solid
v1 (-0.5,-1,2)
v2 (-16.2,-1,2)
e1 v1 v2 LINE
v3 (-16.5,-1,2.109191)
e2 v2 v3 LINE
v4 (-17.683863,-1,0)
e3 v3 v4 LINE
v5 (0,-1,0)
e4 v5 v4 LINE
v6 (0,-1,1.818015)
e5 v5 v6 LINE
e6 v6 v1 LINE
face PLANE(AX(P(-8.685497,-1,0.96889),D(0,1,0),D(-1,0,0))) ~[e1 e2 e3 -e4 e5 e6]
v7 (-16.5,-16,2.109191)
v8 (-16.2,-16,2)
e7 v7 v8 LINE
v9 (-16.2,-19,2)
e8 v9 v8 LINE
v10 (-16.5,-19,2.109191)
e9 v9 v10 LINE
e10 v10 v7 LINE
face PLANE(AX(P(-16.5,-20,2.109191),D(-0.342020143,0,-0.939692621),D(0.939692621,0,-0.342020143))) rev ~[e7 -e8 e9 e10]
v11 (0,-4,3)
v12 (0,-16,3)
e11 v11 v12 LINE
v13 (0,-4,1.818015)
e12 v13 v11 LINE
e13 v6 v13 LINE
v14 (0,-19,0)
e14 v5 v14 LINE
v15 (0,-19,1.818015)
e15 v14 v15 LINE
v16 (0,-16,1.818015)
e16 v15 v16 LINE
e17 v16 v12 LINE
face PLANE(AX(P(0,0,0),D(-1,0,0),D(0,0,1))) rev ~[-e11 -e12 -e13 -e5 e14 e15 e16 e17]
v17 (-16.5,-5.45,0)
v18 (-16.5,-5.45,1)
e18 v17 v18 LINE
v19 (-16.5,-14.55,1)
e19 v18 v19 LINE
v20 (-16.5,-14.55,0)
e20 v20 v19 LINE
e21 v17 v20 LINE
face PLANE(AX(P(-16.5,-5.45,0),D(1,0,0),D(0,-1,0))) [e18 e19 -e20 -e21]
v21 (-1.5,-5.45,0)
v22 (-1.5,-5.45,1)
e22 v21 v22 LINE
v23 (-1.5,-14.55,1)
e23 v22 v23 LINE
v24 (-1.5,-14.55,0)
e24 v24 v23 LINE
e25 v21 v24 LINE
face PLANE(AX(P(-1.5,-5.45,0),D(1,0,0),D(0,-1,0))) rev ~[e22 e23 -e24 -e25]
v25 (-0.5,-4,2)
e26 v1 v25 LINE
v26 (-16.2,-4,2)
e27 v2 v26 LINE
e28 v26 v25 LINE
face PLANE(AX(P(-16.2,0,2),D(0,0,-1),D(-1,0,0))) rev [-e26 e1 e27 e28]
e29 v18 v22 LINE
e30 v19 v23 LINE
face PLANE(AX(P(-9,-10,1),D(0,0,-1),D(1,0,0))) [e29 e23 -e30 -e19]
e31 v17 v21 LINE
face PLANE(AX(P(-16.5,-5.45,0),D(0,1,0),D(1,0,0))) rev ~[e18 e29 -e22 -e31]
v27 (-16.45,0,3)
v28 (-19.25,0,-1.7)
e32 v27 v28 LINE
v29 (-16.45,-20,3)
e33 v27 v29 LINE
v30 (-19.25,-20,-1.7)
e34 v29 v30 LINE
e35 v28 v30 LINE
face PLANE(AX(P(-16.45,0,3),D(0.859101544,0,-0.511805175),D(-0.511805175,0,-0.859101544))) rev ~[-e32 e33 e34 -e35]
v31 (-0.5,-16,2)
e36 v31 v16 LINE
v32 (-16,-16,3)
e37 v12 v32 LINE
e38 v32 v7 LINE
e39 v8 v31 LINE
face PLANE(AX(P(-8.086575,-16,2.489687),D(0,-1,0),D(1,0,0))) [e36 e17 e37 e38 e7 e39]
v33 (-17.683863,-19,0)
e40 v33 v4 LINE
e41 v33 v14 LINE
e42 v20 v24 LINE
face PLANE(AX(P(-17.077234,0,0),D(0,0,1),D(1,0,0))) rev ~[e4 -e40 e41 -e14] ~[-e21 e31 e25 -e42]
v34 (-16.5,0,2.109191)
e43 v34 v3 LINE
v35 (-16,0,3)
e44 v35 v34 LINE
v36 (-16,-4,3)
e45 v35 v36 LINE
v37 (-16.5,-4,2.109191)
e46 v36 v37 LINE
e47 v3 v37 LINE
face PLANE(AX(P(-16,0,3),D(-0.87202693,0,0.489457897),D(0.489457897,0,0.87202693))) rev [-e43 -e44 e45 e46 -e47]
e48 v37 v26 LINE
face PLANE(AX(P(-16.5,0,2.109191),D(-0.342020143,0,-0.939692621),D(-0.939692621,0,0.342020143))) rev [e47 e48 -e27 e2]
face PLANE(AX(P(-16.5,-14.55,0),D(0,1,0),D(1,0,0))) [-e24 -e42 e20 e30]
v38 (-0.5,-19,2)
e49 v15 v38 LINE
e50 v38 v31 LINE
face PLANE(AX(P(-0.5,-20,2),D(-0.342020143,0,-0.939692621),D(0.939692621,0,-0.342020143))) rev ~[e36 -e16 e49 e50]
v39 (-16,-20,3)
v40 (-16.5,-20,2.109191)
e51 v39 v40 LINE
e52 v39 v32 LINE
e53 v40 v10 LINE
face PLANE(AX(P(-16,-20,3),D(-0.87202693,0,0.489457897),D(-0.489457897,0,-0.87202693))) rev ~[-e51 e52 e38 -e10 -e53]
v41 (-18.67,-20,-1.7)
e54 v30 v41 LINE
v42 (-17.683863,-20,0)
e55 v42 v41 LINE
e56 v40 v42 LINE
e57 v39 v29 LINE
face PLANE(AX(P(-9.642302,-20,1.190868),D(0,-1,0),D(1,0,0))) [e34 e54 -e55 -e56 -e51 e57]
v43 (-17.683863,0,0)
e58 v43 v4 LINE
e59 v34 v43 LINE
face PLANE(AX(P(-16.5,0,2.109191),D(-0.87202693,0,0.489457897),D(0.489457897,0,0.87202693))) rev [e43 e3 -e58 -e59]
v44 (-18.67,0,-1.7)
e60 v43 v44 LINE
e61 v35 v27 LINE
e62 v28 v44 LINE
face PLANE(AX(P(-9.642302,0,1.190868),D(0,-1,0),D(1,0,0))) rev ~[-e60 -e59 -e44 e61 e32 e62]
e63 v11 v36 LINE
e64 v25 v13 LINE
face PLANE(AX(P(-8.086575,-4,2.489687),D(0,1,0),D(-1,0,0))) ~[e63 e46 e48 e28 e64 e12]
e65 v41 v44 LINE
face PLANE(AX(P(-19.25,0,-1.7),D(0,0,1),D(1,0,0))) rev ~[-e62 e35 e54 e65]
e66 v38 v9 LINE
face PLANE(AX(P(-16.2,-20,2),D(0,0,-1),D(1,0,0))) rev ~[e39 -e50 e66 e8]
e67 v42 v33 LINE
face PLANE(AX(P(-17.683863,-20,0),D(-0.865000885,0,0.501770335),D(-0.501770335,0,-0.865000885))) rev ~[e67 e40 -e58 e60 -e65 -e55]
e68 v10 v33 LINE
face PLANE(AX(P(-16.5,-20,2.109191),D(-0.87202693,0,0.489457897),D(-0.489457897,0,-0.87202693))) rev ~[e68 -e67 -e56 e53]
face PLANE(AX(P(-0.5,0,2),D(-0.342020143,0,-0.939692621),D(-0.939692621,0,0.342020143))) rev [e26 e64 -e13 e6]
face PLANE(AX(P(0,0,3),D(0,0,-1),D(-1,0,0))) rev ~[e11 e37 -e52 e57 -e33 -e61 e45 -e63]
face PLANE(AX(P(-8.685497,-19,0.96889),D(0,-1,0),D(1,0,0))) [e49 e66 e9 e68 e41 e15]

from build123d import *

# Parameters (mm, degrees)
F1_DEPTH  = 20
F3_DEPTH  = 4
F5_DEPTH  = 1
F7_DEPTH  = 20.001
F10_W     = 15
F10_H     = 9.1
F11_DEPTH = 1


# Not quite as in the source:
# - a pattern or mirror of a feature is missing from the dataset's text; its kind, count and spacing are read off the source's solid


with BuildPart() as f1:
    # F0 (on Front) → F1 (new body)
    with BuildSketch(Plane.XZ):
        Polygon((-16.45, 3), (-19.25, -1.7), (-18.09, -1.7), (-17.0772340426, 0), (0, 0), (0, 3), align=None)
    extrude(amount=F1_DEPTH)

    # F2 (on face) → F3 (cut)
    with BuildSketch(Plane.XZ.offset(20)):
        Polygon((-16.2, 2), (-0.5, 2), (0, 1.8180148829), (0, 3), (-16, 3), (-16.5, 2.1091910703), align=None)
    f3 = extrude(amount=-F3_DEPTH, mode=Mode.SUBTRACT)

    # F3_copies: F3 across plane
    add(f3.mirror(Plane.ZX.offset(-10)), mode=Mode.SUBTRACT)

    # F4 (on face) → F5 (cut)
    with BuildSketch(Plane.XZ.offset(20)):
        Polygon((0, 0), (0, 1.8180148829), (-0.5, 2), (-16.2, 2), (-16.5, 2.1091910703), (-17.683862779, 0), align=None)
    f5 = extrude(amount=-F5_DEPTH, mode=Mode.SUBTRACT)

    # F5_copies: F5 across plane
    add(f5.mirror(Plane.ZX.offset(-10)), mode=Mode.SUBTRACT)

    # F6 (on face) → F7 (cut, through all)
    with BuildSketch(Plane.XZ.offset(20)):
        Polygon((-18.67, -1.7), (-18.09, -1.7), (-17.0772340426, 0), (-17.683862779, 0), align=None)
    extrude(amount=-F7_DEPTH, mode=Mode.SUBTRACT)

    # F10 (on face) → F11 (cut)
    with BuildSketch(Plane(origin=(0, 0, 0), x_dir=(1, 0, 0), z_dir=(0, 0, -1))):
        with Locations((-9, 10)):
            Rectangle(F10_W, F10_H)
    extrude(amount=-F11_DEPTH, mode=Mode.SUBTRACT)


solid = f1.part
